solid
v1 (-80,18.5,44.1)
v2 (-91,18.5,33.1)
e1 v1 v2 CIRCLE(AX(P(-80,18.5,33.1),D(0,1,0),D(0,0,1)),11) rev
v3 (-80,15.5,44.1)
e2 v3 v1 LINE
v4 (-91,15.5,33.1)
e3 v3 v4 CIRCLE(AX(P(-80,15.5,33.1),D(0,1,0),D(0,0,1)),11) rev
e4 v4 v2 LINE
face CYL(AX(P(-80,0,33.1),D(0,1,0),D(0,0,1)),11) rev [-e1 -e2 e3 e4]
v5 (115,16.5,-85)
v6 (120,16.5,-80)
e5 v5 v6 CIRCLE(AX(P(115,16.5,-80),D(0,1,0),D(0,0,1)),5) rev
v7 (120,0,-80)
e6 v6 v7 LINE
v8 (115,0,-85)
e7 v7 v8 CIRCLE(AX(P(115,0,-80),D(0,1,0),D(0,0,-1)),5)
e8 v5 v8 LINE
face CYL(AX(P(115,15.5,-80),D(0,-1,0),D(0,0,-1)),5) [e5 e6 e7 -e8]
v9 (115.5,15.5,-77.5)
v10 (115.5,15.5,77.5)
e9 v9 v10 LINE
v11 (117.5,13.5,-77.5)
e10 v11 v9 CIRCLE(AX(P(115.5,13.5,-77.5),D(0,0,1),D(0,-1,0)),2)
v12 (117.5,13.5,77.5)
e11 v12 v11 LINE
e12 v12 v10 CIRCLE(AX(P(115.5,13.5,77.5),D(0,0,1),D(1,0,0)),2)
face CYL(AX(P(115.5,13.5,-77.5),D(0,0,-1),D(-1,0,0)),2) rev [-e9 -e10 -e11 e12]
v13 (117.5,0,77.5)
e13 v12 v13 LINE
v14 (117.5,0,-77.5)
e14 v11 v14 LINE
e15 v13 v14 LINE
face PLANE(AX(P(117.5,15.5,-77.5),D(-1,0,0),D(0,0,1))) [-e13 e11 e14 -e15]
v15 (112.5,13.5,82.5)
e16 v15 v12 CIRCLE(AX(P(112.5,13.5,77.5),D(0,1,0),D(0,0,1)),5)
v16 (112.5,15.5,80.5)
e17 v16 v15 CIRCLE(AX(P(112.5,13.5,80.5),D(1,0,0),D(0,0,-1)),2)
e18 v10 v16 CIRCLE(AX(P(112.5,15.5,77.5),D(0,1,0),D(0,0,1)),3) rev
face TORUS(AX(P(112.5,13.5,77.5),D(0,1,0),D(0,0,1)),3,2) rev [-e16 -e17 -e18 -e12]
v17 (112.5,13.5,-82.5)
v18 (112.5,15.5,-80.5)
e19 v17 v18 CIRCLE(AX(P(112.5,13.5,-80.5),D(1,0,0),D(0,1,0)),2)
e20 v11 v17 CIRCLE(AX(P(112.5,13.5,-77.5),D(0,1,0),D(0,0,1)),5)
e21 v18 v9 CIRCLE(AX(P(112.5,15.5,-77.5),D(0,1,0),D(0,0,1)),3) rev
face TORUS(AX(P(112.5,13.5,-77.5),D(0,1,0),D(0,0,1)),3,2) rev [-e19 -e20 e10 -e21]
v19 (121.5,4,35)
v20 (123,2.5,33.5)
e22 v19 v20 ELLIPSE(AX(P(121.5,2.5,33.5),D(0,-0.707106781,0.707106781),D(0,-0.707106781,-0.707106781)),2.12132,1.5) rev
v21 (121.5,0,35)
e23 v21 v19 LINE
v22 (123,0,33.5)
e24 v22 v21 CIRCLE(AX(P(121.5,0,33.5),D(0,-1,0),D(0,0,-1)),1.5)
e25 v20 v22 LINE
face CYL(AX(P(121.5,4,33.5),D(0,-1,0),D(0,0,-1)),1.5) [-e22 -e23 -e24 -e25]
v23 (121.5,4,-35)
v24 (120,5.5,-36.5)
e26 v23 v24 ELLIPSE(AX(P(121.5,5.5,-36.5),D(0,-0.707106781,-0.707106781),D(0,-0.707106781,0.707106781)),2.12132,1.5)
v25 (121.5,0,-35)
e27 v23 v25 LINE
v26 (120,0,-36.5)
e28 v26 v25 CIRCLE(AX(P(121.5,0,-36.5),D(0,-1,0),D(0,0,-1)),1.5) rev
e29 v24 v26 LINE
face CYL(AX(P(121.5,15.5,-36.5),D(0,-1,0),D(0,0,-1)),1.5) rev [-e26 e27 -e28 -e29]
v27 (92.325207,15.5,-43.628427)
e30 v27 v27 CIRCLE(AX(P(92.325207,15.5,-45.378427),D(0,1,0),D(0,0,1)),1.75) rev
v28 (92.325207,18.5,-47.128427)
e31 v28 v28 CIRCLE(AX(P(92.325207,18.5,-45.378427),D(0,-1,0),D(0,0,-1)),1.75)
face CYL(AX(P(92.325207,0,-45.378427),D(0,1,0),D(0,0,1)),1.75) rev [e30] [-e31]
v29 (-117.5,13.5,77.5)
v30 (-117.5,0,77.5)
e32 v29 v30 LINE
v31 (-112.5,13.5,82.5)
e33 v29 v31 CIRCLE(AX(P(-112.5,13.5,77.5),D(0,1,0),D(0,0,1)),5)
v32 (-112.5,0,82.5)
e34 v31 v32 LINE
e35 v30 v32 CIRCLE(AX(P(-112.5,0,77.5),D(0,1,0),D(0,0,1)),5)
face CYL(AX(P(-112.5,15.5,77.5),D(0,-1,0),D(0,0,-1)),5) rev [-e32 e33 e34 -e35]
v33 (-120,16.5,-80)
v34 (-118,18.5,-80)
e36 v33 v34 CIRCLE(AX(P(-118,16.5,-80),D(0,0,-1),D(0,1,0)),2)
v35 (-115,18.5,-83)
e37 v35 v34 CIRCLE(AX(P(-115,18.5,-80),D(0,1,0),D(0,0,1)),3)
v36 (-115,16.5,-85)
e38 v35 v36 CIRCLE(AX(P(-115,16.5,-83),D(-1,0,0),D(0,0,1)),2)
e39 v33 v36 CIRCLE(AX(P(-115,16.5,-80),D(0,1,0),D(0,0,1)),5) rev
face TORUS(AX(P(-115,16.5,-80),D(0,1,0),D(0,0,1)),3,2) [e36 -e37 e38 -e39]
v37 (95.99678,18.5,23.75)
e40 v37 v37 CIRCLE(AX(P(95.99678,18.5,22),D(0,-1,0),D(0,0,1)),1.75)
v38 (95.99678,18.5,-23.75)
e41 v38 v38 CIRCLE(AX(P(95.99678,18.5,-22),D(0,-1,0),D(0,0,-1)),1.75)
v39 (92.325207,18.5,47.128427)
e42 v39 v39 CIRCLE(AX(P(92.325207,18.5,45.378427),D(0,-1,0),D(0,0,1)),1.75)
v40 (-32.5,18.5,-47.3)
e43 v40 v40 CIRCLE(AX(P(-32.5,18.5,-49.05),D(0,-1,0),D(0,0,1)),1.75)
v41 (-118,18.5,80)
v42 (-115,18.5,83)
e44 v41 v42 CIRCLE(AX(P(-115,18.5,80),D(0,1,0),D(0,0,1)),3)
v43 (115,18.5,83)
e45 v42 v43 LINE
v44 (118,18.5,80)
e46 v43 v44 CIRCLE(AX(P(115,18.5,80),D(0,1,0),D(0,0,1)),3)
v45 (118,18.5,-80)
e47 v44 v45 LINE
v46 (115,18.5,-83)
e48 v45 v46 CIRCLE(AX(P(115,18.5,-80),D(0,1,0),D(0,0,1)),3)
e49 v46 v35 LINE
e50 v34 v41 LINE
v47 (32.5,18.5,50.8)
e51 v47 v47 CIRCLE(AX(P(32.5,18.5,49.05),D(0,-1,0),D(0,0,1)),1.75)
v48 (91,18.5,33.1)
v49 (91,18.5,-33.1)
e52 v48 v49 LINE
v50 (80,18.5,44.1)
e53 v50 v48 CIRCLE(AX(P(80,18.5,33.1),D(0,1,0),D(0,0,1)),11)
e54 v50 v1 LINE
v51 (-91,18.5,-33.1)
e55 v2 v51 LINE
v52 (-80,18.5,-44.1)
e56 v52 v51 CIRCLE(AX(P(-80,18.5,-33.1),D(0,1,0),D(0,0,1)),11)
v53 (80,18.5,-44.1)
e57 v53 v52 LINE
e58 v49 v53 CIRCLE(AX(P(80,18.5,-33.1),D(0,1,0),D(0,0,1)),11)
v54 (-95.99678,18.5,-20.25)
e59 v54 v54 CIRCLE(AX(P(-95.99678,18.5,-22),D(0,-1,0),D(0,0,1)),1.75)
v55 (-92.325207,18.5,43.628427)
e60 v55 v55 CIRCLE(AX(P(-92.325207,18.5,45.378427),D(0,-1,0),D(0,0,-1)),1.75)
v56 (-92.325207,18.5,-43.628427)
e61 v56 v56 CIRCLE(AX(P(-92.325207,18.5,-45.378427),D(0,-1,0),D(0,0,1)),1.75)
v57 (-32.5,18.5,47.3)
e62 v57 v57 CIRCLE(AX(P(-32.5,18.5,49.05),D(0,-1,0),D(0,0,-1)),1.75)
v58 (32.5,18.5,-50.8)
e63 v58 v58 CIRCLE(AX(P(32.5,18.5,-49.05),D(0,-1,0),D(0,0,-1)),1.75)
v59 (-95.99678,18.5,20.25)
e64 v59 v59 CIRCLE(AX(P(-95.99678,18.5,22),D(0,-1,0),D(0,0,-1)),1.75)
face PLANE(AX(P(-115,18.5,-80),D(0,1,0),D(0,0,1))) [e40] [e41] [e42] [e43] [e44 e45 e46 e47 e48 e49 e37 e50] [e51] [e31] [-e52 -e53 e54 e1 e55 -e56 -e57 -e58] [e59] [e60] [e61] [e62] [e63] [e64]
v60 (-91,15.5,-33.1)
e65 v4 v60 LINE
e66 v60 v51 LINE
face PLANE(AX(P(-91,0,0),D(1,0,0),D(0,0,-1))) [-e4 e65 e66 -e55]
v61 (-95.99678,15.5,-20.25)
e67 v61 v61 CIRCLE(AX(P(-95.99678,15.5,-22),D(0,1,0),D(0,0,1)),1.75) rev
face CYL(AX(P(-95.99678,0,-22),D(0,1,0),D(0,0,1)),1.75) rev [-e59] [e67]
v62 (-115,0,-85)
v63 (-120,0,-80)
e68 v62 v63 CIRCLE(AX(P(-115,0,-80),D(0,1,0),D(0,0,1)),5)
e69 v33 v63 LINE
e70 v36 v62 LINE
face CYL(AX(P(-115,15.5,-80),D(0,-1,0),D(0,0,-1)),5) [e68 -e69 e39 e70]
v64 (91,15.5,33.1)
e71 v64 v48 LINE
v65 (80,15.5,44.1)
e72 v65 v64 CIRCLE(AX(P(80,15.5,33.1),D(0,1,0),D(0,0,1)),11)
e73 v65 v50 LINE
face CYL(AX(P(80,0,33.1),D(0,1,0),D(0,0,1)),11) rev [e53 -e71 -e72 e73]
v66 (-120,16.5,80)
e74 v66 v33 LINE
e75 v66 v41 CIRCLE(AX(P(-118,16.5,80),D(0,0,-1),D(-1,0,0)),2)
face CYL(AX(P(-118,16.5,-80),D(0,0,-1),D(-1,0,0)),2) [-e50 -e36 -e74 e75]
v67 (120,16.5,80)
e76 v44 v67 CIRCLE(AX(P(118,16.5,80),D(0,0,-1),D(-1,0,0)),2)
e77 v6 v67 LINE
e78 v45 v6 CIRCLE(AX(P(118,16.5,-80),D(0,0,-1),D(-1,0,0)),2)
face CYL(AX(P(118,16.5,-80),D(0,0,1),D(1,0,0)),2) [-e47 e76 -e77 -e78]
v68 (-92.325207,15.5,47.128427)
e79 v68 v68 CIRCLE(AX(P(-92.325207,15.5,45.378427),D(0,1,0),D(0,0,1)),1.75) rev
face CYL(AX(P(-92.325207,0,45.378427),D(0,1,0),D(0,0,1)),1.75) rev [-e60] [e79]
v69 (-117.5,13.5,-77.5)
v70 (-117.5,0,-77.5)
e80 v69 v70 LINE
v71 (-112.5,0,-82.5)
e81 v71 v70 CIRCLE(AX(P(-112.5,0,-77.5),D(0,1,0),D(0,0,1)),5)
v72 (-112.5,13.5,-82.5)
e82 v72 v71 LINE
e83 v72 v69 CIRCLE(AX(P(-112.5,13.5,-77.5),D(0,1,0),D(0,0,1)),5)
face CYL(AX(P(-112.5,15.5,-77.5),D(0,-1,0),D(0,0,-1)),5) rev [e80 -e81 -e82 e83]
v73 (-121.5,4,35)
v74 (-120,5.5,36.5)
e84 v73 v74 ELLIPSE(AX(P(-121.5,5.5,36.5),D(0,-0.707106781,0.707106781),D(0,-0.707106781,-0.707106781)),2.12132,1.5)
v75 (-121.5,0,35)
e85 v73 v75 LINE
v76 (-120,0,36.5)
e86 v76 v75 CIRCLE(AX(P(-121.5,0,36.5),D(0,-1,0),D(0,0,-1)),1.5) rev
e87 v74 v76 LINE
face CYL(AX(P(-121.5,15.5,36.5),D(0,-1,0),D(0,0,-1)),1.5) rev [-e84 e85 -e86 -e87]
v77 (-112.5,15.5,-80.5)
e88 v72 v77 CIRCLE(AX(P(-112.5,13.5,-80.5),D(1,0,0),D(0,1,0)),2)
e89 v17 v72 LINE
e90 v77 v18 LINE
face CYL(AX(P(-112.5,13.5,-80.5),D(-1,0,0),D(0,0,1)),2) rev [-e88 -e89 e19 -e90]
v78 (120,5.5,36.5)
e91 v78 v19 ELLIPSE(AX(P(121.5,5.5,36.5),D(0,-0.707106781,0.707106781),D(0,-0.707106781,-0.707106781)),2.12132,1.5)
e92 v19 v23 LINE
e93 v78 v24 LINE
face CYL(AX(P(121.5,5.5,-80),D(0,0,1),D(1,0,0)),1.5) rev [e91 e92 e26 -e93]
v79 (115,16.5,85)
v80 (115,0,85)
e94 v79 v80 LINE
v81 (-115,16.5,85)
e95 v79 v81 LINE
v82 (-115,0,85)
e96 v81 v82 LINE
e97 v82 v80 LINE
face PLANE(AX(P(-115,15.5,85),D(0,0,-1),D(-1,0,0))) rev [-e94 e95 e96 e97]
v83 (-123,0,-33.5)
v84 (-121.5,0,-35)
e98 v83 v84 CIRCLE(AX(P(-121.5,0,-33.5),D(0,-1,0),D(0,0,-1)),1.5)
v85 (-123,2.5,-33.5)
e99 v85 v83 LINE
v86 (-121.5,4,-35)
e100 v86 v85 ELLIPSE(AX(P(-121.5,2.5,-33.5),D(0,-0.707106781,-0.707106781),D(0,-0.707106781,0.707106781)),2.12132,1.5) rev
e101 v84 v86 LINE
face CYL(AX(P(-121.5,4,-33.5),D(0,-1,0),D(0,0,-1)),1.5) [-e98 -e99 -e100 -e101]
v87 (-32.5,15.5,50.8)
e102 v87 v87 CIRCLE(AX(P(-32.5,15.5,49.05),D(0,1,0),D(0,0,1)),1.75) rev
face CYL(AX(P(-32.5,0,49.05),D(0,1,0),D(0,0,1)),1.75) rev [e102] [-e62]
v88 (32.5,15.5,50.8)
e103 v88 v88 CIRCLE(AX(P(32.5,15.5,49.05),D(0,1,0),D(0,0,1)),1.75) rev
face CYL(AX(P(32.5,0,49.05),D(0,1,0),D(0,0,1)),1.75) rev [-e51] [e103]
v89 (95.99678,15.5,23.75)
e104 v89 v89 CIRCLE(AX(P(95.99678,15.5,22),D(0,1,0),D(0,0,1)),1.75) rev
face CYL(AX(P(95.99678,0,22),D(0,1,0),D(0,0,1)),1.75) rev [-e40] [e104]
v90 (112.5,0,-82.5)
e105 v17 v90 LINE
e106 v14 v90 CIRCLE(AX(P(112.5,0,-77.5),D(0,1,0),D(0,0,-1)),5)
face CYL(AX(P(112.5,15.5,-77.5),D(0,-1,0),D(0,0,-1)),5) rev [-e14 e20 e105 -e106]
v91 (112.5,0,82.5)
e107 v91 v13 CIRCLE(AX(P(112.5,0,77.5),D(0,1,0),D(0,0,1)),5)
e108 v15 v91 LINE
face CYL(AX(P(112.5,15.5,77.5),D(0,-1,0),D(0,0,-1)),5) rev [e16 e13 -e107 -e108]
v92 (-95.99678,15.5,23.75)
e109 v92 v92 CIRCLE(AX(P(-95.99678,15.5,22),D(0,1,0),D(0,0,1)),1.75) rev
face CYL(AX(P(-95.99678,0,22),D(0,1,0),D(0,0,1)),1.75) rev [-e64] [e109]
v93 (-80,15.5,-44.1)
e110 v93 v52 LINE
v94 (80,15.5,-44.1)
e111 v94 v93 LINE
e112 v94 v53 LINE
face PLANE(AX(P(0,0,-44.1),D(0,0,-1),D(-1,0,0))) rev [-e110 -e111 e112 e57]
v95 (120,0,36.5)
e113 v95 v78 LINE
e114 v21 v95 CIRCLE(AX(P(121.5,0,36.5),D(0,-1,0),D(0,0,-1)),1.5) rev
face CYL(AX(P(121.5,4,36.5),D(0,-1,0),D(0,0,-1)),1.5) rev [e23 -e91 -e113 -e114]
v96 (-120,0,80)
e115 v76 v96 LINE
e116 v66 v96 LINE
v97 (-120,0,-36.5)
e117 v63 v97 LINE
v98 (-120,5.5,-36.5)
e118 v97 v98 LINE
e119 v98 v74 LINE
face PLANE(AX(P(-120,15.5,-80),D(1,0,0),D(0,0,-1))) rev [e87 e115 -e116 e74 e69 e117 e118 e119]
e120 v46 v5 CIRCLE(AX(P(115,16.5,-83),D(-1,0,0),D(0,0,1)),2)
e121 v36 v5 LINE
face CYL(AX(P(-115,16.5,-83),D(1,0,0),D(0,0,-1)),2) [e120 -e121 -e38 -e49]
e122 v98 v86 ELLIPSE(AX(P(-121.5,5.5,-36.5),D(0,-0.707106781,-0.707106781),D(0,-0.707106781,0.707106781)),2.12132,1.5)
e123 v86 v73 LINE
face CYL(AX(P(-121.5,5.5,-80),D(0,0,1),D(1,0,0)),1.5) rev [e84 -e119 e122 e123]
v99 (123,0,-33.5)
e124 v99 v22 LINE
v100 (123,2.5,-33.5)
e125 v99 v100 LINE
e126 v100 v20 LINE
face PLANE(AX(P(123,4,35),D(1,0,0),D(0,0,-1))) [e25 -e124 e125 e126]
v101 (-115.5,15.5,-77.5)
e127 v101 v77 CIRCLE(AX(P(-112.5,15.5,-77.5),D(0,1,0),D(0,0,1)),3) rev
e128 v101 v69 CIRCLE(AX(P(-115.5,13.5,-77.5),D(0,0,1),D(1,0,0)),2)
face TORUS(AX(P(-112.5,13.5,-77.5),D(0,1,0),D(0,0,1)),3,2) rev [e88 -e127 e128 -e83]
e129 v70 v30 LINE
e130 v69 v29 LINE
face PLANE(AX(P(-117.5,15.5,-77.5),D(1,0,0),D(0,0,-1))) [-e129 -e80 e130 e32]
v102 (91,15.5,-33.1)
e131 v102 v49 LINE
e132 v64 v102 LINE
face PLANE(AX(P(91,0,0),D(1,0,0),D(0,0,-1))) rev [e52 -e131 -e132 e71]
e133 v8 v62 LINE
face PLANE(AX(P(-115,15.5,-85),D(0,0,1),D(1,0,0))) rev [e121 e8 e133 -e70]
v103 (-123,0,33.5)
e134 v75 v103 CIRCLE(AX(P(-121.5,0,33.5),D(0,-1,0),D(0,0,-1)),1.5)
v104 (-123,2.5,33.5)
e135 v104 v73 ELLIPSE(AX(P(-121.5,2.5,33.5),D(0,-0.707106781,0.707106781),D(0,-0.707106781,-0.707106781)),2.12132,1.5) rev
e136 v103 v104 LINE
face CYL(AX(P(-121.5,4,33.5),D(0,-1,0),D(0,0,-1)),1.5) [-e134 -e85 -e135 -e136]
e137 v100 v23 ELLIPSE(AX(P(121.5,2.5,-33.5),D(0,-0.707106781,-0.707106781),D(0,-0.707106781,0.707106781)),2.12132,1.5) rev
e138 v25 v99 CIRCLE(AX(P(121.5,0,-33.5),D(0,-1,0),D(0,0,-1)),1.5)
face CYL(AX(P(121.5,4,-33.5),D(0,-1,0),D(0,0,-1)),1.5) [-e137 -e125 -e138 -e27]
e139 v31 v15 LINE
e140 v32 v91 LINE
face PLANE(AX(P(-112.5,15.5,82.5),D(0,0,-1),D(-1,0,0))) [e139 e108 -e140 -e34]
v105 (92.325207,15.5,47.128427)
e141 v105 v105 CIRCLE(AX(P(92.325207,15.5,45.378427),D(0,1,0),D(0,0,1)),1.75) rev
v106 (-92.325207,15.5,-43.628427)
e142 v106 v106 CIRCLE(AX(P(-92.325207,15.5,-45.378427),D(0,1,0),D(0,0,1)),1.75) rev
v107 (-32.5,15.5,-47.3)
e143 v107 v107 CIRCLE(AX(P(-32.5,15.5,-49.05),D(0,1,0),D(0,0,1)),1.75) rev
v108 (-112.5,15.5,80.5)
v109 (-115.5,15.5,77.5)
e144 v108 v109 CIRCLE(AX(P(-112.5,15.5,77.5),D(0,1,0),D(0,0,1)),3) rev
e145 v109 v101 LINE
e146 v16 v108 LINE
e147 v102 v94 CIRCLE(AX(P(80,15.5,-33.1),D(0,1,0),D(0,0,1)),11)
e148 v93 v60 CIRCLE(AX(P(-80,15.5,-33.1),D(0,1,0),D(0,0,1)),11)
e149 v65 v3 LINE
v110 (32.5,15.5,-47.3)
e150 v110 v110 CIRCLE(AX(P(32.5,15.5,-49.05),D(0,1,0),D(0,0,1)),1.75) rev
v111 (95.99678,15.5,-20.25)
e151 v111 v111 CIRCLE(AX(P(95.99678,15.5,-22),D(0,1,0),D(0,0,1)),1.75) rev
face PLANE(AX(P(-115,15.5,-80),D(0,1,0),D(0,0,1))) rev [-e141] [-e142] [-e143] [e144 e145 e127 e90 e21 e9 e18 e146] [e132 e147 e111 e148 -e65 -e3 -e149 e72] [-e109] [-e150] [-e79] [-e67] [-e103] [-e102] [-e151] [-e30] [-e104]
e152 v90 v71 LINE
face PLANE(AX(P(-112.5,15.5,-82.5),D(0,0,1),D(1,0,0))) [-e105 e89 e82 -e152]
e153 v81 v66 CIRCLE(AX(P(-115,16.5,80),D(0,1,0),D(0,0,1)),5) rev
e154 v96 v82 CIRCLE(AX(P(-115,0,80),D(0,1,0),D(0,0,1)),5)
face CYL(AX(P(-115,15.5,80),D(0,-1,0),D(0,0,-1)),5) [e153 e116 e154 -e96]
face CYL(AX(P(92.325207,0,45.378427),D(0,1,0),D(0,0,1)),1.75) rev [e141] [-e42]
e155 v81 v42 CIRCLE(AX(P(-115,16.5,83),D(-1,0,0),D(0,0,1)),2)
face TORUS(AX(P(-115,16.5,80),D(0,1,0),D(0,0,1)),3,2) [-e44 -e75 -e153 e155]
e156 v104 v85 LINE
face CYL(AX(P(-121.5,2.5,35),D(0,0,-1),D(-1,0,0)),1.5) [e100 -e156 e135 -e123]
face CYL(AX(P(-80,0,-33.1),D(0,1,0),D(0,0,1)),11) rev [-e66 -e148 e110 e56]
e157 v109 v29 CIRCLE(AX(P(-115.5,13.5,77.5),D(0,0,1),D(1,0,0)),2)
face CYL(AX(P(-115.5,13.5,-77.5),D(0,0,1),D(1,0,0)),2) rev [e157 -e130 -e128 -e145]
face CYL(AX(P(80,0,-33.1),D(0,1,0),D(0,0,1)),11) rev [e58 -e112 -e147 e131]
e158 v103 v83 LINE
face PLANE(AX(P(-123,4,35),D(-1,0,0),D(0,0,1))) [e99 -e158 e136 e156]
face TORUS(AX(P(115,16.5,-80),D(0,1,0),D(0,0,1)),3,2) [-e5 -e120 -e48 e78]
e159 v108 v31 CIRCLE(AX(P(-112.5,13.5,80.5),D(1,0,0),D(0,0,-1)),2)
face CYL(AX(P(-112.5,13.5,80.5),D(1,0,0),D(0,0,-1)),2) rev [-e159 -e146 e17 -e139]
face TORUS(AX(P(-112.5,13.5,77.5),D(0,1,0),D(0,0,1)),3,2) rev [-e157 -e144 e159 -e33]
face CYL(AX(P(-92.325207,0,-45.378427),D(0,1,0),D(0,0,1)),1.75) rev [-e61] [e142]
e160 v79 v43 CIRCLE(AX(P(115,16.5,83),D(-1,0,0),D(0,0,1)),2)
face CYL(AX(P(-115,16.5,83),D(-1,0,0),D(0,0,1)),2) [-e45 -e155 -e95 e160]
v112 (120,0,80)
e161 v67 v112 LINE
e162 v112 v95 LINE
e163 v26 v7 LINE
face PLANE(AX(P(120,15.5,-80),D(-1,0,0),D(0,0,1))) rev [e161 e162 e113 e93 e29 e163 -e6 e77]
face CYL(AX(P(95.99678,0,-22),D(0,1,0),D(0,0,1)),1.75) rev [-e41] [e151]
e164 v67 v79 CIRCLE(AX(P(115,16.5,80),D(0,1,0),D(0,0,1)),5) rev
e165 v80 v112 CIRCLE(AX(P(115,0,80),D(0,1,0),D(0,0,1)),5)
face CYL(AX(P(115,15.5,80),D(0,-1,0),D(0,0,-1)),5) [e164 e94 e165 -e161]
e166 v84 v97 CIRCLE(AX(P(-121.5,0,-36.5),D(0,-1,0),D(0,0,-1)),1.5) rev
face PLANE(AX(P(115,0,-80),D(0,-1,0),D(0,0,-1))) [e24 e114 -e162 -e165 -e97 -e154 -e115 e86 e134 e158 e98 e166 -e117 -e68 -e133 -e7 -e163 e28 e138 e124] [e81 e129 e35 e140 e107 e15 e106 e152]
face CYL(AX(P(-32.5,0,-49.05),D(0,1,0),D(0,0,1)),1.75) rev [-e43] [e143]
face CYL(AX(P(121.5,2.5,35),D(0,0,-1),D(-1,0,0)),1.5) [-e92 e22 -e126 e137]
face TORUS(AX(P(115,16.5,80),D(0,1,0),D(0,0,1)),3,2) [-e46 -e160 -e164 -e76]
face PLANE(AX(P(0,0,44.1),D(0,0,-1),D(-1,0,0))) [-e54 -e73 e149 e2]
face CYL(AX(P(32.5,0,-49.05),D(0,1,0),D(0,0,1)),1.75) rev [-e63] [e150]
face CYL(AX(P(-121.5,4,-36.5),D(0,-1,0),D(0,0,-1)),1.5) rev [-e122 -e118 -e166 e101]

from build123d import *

# Parameters (mm, degrees)
EXTRUDE_1_DEPTH     = 15.5
EXTRUDE_2_DEPTH     = 3
FILLET_2_R          = 2
SKETCH_4_W          = 3
SKETCH_4_H          = 70
EXTRUDE_3_DEPTH     = 4
FILLET_3_R          = 1.5
CUT_EXTRUDE_3_DEPTH = 151.652746407
SKETCH_10_R         = 1.75
CUT_EXTRUDE_4_DEPTH = 164.099662783
SKETCH_9_R          = 1.75
CUT_EXTRUDE_5_DEPTH = 164.099662783


with BuildPart() as part:
    # 草图1 → 凸台-拉伸1 (new body)
    with BuildSketch(Plane(origin=(0, 0, 0), x_dir=(1, 0, 0), z_dir=(0, 1, 0))):
        with BuildLine():
            Line((-115, 85), (115, 85))
            ThreePointArc((115, 85), (118.535533906, 83.535533906), (120, 80))
            Line((120, 80), (120, -80))
            ThreePointArc((120, -80), (118.535533906, -83.535533906), (115, -85))
            Line((115, -85), (-115, -85))
            ThreePointArc((-115, -85), (-118.535533906, -83.535533906), (-120, -80))
            Line((-120, -80), (-120, 80))
            ThreePointArc((-120, 80), (-118.535533906, 83.535533906), (-115, 85))
        make_face()
        with BuildLine():
            Line((-112.5, 82.5), (112.5, 82.5))
            ThreePointArc((112.5, 82.5), (116.035533906, 81.035533906), (117.5, 77.5))
            Line((117.5, 77.5), (117.5, -77.5))
            ThreePointArc((117.5, -77.5), (116.035533906, -81.035533906), (112.5, -82.5))
            Line((112.5, -82.5), (-112.5, -82.5))
            ThreePointArc((-112.5, -82.5), (-116.035533906, -81.035533906), (-117.5, -77.5))
            Line((-117.5, -77.5), (-117.5, 77.5))
            ThreePointArc((-117.5, 77.5), (-116.035533906, 81.035533906), (-112.5, 82.5))
        make_face(mode=Mode.SUBTRACT)
    extrude(amount=EXTRUDE_1_DEPTH)

    # 草图3 → 凸台-拉伸2 (add)
    with BuildSketch(Plane(origin=(0, 15.5, 0), x_dir=(1, 0, 0), z_dir=(0, 1, 0))):
        with BuildLine():
            Line((-120, 80), (-120, -80))
            ThreePointArc((-120, -80), (-118.535533906, -83.535533906), (-115, -85))
            Line((-115, -85), (115, -85))
            ThreePointArc((115, -85), (118.535533906, -83.535533906), (120, -80))
            Line((120, -80), (120, 80))
            ThreePointArc((120, 80), (118.535533906, 83.535533906), (115, 85))
            Line((115, 85), (-115, 85))
            ThreePointArc((-115, 85), (-118.535533906, 83.535533906), (-120, 80))
        make_face()
    extrude(amount=EXTRUDE_2_DEPTH)

    # 圆角2
    fillet_2_edges = [part.edges().sort_by_distance(p)[0] for p in [
        (116.035533906, 15.5, -81.035533906),
        (0, 15.5, -82.5),
        (-116.035533906, 15.5, -81.035533906),
        (-117.5, 15.5, 0),
        (-116.035533906, 15.5, 81.035533906),
        (0, 15.5, 82.5),
        (116.035533906, 15.5, 81.035533906),
        (117.5, 15.5, 0),
        (-118.535533906, 18.5, -83.535533906),
        (-120, 18.5, 0),
        (-118.535533906, 18.5, 83.535533906),
        (0, 18.5, 85),
        (118.535533906, 18.5, 83.535533906),
        (120, 18.5, 0),
        (118.535533906, 18.5, -83.535533906),
        (0, 18.5, -85),
    ]]
    fillet(fillet_2_edges, radius=FILLET_2_R)

    # 草图4 → 凸台-拉伸3 (add)
    with BuildSketch(Plane.XZ):
        with Locations((-121.5, 0)):
            Rectangle(SKETCH_4_W, SKETCH_4_H)
        with Locations((121.5, 0)):
            Rectangle(SKETCH_4_W, SKETCH_4_H)
    extrude(amount=-EXTRUDE_3_DEPTH)

    # 圆角3
    fillet_3_edges = [part.edges().sort_by_distance(p)[0] for p in [
        (120, 4, 0),
        (-120, 4, 0),
        (-123, 4, 0),
        (123, 4, 0),
        (120, 2, -35),
        (123, 2, -35),
        (123, 2, 35),
        (120, 2, 35),
        (-120, 2, -35),
        (-123, 2, -35),
        (-123, 2, 35),
        (-120, 2, 35),
    ]]
    fillet(fillet_3_edges, radius=FILLET_3_R - 0.0001)  # a hair under: the kernel refuses the full size

    # 草图5 → 切除-拉伸3 (cut, through all)
    with BuildSketch(Plane(origin=(0, 18.5, 0), x_dir=(1, 0, 0), z_dir=(0, 1, 0))):
        with BuildLine():
            Line((80, 44.1), (-80, 44.1))
            ThreePointArc((-80, 44.1), (-87.778174593, 40.878174593), (-91, 33.1))
            Line((-91, 33.1), (-91, -33.1))
            ThreePointArc((-91, -33.1), (-87.778174593, -40.878174593), (-80, -44.1))
            Line((-80, -44.1), (80, -44.1))
            ThreePointArc((80, -44.1), (87.778174593, -40.878174593), (91, -33.1))
            Line((91, -33.1), (91, 33.1))
            ThreePointArc((91, 33.1), (87.778174593, 40.878174593), (80, 44.1))
        make_face()
    extrude(amount=-CUT_EXTRUDE_3_DEPTH, mode=Mode.SUBTRACT)

    # 草图10 → 切除-拉伸4 (cut, through all)
    with BuildSketch(Plane(origin=(0, 18.5, -20.5), x_dir=(1, 0, 0), z_dir=(0, -1, 0))):
        with Locations(Location((-92.325207, 65.878427, 0), (0, 0, 90))):
            Circle(SKETCH_10_R)
        with Locations(Location((92.325207, 65.878427, 0), (0, 0, 90))):
            Circle(SKETCH_10_R)
        with Locations(Location((92.325207, -24.878427, 0), (0, 0, 90))):
            Circle(SKETCH_10_R)
        with Locations(Location((-92.325207, -24.878427, 0), (0, 0, 90))):
            Circle(SKETCH_10_R)
    extrude(amount=CUT_EXTRUDE_4_DEPTH, mode=Mode.SUBTRACT)

    # 草图9 → 切除-拉伸5 (cut, through all)
    with BuildSketch(Plane(origin=(0, 18.5, -20.5), x_dir=(1, 0, 0), z_dir=(0, -1, 0))):
        with Locations(Location((-32.5, 69.55, 0), (0, 0, 90))):
            Circle(SKETCH_9_R)
        with Locations(Location((-95.99678, 42.5, 0), (0, 0, 90))):
            Circle(SKETCH_9_R)
        with Locations(Location((-32.5, -28.55, 0), (0, 0, 90))):
            Circle(SKETCH_9_R)
        with Locations(Location((-95.99678, -1.5, 0), (0, 0, 90))):
            Circle(SKETCH_9_R)
        with Locations(Location((32.5, -28.55, 0), (0, 0, 90))):
            Circle(SKETCH_9_R)
        with Locations(Location((95.99678, -1.5, 0), (0, 0, 90))):
            Circle(SKETCH_9_R)
        with Locations(Location((32.5, 69.55, 0), (0, 0, 90))):
            Circle(SKETCH_9_R)
        with Locations(Location((95.99678, 42.5, 0), (0, 0, 90))):
            Circle(SKETCH_9_R)
    extrude(amount=CUT_EXTRUDE_5_DEPTH, mode=Mode.SUBTRACT)


solid = part.part
